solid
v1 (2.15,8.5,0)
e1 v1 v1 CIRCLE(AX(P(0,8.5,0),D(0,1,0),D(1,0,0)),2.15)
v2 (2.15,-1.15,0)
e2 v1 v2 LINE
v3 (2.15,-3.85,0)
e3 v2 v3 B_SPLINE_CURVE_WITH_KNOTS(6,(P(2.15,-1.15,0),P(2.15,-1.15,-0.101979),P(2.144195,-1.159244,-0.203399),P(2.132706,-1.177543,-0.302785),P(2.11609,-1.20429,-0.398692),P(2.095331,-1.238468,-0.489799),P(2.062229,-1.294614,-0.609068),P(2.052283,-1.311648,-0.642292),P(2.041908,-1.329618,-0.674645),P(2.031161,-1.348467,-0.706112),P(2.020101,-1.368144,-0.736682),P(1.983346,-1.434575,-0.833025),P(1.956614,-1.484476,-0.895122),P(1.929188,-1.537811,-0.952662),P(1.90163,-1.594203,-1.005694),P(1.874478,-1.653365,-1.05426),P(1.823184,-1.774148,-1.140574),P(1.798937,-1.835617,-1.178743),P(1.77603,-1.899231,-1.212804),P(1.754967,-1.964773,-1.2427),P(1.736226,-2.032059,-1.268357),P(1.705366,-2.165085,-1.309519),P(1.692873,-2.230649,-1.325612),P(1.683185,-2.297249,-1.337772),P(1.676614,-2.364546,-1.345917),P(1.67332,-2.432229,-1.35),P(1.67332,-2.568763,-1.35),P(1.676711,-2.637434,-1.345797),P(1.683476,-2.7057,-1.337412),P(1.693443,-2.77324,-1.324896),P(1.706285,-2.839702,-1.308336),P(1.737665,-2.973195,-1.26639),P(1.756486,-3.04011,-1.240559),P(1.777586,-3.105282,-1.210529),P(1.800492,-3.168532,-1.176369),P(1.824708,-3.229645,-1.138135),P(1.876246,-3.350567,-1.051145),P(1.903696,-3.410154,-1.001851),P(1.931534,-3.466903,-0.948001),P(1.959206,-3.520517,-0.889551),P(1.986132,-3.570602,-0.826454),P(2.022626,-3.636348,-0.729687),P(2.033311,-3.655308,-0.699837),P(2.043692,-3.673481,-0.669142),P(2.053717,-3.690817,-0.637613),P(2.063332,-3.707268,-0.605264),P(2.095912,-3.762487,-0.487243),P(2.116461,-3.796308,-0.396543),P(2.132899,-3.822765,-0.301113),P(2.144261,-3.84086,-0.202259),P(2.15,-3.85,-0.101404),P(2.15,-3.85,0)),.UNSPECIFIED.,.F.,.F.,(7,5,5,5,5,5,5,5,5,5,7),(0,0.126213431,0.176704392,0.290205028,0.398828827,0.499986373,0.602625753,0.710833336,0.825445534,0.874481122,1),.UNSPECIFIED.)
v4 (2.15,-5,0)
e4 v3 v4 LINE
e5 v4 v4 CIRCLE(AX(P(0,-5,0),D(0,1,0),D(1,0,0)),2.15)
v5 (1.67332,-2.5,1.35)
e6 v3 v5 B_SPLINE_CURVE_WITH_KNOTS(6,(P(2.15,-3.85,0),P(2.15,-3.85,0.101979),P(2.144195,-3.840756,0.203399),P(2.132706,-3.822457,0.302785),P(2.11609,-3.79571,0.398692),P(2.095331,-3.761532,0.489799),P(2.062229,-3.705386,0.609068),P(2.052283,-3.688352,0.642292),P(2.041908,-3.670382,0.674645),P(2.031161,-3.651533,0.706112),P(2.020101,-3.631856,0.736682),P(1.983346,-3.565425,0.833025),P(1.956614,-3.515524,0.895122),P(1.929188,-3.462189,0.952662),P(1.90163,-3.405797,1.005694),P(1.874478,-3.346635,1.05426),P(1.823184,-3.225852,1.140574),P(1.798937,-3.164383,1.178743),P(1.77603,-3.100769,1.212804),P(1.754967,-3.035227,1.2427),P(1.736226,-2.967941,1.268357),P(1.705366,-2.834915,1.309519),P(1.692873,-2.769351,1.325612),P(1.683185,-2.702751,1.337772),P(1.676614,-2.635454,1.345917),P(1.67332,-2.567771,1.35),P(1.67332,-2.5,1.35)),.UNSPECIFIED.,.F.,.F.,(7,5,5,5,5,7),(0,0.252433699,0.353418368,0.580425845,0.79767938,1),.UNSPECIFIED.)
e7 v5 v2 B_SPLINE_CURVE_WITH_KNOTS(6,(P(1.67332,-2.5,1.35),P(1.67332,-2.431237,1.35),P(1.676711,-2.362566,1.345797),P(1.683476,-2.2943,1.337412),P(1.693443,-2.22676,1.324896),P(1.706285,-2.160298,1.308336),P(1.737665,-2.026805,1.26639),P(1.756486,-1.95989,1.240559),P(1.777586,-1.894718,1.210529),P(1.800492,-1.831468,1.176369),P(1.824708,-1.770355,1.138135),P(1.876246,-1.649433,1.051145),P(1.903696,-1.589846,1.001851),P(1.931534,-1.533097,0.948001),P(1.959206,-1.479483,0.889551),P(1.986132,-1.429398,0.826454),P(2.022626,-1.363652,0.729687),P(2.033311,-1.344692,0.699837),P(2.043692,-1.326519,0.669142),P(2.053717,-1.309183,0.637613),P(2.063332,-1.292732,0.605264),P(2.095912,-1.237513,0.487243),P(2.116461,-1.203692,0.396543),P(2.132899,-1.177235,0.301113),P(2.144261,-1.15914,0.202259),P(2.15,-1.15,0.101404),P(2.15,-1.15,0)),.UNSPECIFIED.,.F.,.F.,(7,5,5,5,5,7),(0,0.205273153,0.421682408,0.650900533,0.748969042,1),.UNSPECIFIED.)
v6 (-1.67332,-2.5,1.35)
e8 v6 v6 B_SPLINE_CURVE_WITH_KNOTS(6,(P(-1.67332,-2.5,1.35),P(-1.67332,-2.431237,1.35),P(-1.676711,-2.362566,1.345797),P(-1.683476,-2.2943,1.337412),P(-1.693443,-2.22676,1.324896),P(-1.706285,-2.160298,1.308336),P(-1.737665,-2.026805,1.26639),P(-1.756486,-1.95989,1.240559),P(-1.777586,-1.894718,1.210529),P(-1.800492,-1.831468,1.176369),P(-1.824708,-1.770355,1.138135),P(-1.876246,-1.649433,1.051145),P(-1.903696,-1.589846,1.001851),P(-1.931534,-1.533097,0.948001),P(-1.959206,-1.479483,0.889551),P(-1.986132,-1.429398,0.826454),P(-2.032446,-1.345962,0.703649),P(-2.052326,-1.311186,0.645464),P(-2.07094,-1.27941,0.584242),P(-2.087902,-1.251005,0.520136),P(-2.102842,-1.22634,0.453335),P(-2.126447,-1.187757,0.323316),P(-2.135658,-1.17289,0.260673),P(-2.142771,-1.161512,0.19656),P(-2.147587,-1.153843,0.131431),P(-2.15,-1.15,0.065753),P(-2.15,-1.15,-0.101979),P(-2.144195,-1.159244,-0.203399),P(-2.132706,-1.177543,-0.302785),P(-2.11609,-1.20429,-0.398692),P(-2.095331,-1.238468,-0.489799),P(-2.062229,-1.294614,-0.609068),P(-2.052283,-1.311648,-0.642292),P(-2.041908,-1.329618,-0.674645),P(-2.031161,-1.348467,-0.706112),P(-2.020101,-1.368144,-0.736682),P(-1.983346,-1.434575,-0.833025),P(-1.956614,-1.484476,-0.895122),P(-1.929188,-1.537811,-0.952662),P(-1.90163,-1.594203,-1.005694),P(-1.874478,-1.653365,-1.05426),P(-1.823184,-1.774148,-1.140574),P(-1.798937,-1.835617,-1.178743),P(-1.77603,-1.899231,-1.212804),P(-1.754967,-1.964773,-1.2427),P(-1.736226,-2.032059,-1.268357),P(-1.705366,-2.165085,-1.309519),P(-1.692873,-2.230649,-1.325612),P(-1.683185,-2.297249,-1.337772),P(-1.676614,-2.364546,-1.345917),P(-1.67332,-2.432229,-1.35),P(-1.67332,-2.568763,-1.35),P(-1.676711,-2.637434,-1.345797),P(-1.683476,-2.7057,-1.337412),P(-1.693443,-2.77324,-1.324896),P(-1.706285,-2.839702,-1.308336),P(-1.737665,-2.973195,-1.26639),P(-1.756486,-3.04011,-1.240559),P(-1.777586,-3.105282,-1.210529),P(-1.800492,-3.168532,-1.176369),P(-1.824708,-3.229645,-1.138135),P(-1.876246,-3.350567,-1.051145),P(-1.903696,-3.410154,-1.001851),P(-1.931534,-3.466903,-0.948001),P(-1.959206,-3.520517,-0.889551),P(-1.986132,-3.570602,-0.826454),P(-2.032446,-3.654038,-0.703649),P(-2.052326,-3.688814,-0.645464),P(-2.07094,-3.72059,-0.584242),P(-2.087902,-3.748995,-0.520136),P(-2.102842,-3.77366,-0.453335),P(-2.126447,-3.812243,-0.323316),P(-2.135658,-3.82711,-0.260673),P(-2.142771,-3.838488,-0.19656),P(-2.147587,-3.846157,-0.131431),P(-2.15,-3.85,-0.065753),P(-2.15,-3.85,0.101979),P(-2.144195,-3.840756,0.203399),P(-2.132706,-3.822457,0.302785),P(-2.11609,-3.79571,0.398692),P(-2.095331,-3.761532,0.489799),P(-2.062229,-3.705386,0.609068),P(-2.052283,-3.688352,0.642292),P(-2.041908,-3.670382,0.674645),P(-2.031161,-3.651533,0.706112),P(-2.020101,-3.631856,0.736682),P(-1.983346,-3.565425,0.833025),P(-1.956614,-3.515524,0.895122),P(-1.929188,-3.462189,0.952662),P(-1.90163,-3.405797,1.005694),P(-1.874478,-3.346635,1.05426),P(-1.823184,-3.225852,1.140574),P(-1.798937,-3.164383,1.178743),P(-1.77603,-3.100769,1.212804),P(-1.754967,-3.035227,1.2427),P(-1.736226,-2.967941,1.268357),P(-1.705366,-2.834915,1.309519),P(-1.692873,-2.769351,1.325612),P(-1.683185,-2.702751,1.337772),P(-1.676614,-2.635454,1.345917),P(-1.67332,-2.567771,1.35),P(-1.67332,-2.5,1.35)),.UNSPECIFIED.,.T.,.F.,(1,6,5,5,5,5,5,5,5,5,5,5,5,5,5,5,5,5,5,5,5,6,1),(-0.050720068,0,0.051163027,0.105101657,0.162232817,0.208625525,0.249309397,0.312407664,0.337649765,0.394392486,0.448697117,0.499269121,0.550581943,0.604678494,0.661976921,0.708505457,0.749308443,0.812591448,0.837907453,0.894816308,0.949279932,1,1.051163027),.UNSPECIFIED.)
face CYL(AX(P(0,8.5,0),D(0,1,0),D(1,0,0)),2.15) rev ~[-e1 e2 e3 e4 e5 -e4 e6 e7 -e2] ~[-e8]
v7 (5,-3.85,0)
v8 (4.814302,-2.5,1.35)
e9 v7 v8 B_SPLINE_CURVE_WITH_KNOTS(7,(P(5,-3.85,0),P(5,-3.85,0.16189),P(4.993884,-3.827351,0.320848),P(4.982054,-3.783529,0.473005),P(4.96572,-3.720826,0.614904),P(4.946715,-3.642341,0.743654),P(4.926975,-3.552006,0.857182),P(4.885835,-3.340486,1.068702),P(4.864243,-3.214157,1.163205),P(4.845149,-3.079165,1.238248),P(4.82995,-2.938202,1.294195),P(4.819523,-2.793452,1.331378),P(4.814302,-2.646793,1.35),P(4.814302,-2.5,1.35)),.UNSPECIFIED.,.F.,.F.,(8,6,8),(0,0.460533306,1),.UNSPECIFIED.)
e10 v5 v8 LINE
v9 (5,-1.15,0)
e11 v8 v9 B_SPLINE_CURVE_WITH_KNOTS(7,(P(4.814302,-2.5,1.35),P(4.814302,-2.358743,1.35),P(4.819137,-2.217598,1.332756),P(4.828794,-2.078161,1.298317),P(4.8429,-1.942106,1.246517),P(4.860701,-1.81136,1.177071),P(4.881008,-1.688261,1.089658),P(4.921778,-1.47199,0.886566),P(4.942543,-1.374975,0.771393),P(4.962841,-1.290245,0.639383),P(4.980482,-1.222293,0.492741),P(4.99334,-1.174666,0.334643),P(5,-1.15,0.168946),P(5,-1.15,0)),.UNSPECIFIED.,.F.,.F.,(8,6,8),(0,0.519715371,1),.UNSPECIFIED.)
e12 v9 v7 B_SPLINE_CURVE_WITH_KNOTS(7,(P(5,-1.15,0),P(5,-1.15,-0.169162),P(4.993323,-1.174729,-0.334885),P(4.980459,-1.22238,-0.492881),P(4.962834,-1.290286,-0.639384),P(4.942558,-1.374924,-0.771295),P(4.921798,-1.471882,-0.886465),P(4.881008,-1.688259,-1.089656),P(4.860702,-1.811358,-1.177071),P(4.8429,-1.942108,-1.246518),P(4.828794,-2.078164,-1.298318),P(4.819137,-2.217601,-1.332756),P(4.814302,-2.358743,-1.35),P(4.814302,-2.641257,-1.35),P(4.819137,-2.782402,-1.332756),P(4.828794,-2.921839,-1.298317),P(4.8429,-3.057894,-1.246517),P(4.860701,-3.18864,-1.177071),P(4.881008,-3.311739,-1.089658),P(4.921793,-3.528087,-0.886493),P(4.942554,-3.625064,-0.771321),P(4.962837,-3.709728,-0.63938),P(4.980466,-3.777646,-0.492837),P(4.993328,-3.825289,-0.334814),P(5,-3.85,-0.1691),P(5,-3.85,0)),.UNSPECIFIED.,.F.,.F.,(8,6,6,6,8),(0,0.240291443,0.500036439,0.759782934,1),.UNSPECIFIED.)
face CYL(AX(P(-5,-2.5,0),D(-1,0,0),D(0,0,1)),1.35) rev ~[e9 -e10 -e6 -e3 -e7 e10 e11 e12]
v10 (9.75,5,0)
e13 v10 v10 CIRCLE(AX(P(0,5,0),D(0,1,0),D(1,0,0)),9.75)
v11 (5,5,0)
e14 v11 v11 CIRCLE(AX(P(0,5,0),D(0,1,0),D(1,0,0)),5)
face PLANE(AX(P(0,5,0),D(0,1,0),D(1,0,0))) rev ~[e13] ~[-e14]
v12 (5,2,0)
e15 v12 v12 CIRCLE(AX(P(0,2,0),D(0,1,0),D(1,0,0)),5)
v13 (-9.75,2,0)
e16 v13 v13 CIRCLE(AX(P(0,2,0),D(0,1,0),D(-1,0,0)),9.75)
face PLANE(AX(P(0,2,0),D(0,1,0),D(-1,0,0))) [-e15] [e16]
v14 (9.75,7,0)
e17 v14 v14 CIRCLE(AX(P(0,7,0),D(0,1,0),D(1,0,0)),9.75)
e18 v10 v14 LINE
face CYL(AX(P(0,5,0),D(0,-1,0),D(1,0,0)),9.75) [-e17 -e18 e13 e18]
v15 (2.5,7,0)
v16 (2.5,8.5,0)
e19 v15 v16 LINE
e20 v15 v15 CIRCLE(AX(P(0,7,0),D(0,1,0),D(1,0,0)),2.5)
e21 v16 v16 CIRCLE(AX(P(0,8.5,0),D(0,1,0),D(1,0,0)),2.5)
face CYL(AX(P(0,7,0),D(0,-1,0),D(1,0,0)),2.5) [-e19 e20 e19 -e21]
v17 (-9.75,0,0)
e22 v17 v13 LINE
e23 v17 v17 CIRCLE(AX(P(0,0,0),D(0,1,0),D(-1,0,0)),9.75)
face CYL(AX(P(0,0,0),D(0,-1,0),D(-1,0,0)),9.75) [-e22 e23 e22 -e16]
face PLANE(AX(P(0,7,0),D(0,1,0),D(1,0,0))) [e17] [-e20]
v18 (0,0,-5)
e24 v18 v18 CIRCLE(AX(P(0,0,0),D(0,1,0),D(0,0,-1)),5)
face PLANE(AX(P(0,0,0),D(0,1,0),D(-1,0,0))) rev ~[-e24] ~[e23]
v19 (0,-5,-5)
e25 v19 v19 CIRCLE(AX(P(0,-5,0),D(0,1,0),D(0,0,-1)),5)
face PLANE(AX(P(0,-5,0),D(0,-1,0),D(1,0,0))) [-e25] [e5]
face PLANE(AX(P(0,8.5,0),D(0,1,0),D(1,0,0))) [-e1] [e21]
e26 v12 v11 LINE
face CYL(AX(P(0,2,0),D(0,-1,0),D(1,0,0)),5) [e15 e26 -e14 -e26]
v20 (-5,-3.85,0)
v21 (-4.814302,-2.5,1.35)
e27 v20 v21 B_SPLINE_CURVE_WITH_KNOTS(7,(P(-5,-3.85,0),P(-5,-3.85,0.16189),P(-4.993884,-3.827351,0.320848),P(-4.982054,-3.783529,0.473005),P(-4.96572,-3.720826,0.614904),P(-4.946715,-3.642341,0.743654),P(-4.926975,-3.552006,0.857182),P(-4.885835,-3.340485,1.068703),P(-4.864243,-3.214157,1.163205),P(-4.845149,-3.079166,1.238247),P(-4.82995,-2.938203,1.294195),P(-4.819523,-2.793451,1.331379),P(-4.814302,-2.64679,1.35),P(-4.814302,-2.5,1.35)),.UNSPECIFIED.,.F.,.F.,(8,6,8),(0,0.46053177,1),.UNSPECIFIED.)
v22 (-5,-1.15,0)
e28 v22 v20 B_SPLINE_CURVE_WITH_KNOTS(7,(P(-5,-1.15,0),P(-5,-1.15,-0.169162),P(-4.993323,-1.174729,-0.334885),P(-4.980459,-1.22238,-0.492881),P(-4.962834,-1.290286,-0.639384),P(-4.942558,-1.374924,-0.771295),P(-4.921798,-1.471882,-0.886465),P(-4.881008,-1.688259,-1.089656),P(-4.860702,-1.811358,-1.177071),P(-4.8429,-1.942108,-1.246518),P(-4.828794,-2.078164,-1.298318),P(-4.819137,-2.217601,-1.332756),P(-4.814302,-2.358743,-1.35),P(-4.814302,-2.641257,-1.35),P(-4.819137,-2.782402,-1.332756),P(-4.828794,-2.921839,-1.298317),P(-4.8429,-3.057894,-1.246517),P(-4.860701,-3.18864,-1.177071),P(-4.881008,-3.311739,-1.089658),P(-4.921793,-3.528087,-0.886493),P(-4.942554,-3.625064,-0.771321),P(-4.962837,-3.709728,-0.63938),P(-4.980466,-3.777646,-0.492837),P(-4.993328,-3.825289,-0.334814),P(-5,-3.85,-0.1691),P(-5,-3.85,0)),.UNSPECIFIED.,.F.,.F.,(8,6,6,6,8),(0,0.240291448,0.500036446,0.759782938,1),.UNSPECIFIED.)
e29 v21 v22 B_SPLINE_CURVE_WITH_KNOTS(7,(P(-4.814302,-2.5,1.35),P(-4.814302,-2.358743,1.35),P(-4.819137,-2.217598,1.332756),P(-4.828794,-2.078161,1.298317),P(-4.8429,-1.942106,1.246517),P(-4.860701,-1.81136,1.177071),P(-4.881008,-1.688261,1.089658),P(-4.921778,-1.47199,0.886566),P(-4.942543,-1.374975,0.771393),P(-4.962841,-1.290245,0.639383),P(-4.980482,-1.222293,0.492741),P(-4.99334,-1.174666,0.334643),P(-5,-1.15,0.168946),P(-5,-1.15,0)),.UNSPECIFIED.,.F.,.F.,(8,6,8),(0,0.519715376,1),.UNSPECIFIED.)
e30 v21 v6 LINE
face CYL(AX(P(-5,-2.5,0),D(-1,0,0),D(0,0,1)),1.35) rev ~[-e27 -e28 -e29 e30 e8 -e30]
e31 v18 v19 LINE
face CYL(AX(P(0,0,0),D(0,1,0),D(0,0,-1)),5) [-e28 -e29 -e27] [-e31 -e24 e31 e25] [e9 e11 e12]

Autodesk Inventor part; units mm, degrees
ref_plane "YZ Plane" through (0, 0, 0) normal (1, 0, 0) x (0, 1, 0)
ref_plane "XZ Plane" through (0, 0, 0) normal (0, 1, 0) x (-1, 0, 0)
ref_plane "XY Plane" through (0, 0, 0) normal (0, 0, 1) x (1, 0, 0)
sketch "Эскиз1" plane through (0, 0, 0) normal (0, 1, 0) x (-1, 0, 0)
  circle A0 centre (0, 0) radius 9.75
  dimension "d0" = 19.5
extrude "Выдавливание1" add sketch "Эскиз1" along normal blind 2
sketch "Эскиз5" plane through (0, 0, 0) normal (0, -1, 0) x (1, 0, 0)
  line L0 (5, -5) -> (-5, -5)
  line L1 (-5, -5) -> (-5, 5)
  line L2 (-5, 5) -> (5, 5)
  line L3 (5, 5) -> (5, -5)
  point P0 (0, 0)
  dimension "d12" = 10
  dimension "d13" = 10
  dimension "d17" = 5
  dimension "d27" = 5
extrude "Выдавливание5" add sketch "Эскиз5" along normal blind 5
sketch "Эскиз6" plane through (-5, 0, -5) normal (-1, 0, 0) x (0, 0, 1)
  circle A0 centre (5, -2.5) radius 1.35
  line L0 (10, -5) -> (0, -5) projected
  line L1 (0, 0) -> (0, -5) projected
  point P0 (5, 0)
  point P1 (0, -2.5)
  dimension "d30" = 2.7
  dimension "d31" = 2.5
  dimension "d32" = 5
extrude "Выдавливание6" cut sketch "Эскиз6" against normal blind 15.75
fillet "Сопряжение1" radius 5 4 edges at (5, -2.5, 5) (-5, -2.5, 5) (-5, -2.5, -5) (5, -2.5, -5)
sketch "Эскиз11" plane through (0, 2, 0) normal (0, 1, 0) x (1, 0, 0)
  circle A0 centre (0, 0) radius 5
  dimension "d47" = 10
extrude "Выдавливание9" add sketch "Эскиз11" along normal blind 3
sketch "Эскиз12" plane through (0, 5, 0) normal (0, 1, 0) x (1, 0, 0)
  circle A0 centre (0, 0) radius 9.75
  dimension "d50" = 19.5
extrude "Выдавливание10" add sketch "Эскиз12" along normal blind 2
sketch "Эскиз14" plane through (0, 7, 0) normal (0, 1, 0) x (1, 0, 0)
  circle A0 centre (0, 0) radius 2.5
  dimension "d56" = 5
extrude "Выдавливание12" add sketch "Эскиз14" along normal blind 1.5
sketch "Эскиз15" plane through (0, 8.5, 0) normal (0, 1, 0) x (1, 0, 0)
  circle A0 centre (0, 0) radius 2.15
  dimension "d59" = 4.3
extrude "Выдавливание13" cut sketch "Эскиз15" against normal blind 33.5
properties part number "koleso_left"
